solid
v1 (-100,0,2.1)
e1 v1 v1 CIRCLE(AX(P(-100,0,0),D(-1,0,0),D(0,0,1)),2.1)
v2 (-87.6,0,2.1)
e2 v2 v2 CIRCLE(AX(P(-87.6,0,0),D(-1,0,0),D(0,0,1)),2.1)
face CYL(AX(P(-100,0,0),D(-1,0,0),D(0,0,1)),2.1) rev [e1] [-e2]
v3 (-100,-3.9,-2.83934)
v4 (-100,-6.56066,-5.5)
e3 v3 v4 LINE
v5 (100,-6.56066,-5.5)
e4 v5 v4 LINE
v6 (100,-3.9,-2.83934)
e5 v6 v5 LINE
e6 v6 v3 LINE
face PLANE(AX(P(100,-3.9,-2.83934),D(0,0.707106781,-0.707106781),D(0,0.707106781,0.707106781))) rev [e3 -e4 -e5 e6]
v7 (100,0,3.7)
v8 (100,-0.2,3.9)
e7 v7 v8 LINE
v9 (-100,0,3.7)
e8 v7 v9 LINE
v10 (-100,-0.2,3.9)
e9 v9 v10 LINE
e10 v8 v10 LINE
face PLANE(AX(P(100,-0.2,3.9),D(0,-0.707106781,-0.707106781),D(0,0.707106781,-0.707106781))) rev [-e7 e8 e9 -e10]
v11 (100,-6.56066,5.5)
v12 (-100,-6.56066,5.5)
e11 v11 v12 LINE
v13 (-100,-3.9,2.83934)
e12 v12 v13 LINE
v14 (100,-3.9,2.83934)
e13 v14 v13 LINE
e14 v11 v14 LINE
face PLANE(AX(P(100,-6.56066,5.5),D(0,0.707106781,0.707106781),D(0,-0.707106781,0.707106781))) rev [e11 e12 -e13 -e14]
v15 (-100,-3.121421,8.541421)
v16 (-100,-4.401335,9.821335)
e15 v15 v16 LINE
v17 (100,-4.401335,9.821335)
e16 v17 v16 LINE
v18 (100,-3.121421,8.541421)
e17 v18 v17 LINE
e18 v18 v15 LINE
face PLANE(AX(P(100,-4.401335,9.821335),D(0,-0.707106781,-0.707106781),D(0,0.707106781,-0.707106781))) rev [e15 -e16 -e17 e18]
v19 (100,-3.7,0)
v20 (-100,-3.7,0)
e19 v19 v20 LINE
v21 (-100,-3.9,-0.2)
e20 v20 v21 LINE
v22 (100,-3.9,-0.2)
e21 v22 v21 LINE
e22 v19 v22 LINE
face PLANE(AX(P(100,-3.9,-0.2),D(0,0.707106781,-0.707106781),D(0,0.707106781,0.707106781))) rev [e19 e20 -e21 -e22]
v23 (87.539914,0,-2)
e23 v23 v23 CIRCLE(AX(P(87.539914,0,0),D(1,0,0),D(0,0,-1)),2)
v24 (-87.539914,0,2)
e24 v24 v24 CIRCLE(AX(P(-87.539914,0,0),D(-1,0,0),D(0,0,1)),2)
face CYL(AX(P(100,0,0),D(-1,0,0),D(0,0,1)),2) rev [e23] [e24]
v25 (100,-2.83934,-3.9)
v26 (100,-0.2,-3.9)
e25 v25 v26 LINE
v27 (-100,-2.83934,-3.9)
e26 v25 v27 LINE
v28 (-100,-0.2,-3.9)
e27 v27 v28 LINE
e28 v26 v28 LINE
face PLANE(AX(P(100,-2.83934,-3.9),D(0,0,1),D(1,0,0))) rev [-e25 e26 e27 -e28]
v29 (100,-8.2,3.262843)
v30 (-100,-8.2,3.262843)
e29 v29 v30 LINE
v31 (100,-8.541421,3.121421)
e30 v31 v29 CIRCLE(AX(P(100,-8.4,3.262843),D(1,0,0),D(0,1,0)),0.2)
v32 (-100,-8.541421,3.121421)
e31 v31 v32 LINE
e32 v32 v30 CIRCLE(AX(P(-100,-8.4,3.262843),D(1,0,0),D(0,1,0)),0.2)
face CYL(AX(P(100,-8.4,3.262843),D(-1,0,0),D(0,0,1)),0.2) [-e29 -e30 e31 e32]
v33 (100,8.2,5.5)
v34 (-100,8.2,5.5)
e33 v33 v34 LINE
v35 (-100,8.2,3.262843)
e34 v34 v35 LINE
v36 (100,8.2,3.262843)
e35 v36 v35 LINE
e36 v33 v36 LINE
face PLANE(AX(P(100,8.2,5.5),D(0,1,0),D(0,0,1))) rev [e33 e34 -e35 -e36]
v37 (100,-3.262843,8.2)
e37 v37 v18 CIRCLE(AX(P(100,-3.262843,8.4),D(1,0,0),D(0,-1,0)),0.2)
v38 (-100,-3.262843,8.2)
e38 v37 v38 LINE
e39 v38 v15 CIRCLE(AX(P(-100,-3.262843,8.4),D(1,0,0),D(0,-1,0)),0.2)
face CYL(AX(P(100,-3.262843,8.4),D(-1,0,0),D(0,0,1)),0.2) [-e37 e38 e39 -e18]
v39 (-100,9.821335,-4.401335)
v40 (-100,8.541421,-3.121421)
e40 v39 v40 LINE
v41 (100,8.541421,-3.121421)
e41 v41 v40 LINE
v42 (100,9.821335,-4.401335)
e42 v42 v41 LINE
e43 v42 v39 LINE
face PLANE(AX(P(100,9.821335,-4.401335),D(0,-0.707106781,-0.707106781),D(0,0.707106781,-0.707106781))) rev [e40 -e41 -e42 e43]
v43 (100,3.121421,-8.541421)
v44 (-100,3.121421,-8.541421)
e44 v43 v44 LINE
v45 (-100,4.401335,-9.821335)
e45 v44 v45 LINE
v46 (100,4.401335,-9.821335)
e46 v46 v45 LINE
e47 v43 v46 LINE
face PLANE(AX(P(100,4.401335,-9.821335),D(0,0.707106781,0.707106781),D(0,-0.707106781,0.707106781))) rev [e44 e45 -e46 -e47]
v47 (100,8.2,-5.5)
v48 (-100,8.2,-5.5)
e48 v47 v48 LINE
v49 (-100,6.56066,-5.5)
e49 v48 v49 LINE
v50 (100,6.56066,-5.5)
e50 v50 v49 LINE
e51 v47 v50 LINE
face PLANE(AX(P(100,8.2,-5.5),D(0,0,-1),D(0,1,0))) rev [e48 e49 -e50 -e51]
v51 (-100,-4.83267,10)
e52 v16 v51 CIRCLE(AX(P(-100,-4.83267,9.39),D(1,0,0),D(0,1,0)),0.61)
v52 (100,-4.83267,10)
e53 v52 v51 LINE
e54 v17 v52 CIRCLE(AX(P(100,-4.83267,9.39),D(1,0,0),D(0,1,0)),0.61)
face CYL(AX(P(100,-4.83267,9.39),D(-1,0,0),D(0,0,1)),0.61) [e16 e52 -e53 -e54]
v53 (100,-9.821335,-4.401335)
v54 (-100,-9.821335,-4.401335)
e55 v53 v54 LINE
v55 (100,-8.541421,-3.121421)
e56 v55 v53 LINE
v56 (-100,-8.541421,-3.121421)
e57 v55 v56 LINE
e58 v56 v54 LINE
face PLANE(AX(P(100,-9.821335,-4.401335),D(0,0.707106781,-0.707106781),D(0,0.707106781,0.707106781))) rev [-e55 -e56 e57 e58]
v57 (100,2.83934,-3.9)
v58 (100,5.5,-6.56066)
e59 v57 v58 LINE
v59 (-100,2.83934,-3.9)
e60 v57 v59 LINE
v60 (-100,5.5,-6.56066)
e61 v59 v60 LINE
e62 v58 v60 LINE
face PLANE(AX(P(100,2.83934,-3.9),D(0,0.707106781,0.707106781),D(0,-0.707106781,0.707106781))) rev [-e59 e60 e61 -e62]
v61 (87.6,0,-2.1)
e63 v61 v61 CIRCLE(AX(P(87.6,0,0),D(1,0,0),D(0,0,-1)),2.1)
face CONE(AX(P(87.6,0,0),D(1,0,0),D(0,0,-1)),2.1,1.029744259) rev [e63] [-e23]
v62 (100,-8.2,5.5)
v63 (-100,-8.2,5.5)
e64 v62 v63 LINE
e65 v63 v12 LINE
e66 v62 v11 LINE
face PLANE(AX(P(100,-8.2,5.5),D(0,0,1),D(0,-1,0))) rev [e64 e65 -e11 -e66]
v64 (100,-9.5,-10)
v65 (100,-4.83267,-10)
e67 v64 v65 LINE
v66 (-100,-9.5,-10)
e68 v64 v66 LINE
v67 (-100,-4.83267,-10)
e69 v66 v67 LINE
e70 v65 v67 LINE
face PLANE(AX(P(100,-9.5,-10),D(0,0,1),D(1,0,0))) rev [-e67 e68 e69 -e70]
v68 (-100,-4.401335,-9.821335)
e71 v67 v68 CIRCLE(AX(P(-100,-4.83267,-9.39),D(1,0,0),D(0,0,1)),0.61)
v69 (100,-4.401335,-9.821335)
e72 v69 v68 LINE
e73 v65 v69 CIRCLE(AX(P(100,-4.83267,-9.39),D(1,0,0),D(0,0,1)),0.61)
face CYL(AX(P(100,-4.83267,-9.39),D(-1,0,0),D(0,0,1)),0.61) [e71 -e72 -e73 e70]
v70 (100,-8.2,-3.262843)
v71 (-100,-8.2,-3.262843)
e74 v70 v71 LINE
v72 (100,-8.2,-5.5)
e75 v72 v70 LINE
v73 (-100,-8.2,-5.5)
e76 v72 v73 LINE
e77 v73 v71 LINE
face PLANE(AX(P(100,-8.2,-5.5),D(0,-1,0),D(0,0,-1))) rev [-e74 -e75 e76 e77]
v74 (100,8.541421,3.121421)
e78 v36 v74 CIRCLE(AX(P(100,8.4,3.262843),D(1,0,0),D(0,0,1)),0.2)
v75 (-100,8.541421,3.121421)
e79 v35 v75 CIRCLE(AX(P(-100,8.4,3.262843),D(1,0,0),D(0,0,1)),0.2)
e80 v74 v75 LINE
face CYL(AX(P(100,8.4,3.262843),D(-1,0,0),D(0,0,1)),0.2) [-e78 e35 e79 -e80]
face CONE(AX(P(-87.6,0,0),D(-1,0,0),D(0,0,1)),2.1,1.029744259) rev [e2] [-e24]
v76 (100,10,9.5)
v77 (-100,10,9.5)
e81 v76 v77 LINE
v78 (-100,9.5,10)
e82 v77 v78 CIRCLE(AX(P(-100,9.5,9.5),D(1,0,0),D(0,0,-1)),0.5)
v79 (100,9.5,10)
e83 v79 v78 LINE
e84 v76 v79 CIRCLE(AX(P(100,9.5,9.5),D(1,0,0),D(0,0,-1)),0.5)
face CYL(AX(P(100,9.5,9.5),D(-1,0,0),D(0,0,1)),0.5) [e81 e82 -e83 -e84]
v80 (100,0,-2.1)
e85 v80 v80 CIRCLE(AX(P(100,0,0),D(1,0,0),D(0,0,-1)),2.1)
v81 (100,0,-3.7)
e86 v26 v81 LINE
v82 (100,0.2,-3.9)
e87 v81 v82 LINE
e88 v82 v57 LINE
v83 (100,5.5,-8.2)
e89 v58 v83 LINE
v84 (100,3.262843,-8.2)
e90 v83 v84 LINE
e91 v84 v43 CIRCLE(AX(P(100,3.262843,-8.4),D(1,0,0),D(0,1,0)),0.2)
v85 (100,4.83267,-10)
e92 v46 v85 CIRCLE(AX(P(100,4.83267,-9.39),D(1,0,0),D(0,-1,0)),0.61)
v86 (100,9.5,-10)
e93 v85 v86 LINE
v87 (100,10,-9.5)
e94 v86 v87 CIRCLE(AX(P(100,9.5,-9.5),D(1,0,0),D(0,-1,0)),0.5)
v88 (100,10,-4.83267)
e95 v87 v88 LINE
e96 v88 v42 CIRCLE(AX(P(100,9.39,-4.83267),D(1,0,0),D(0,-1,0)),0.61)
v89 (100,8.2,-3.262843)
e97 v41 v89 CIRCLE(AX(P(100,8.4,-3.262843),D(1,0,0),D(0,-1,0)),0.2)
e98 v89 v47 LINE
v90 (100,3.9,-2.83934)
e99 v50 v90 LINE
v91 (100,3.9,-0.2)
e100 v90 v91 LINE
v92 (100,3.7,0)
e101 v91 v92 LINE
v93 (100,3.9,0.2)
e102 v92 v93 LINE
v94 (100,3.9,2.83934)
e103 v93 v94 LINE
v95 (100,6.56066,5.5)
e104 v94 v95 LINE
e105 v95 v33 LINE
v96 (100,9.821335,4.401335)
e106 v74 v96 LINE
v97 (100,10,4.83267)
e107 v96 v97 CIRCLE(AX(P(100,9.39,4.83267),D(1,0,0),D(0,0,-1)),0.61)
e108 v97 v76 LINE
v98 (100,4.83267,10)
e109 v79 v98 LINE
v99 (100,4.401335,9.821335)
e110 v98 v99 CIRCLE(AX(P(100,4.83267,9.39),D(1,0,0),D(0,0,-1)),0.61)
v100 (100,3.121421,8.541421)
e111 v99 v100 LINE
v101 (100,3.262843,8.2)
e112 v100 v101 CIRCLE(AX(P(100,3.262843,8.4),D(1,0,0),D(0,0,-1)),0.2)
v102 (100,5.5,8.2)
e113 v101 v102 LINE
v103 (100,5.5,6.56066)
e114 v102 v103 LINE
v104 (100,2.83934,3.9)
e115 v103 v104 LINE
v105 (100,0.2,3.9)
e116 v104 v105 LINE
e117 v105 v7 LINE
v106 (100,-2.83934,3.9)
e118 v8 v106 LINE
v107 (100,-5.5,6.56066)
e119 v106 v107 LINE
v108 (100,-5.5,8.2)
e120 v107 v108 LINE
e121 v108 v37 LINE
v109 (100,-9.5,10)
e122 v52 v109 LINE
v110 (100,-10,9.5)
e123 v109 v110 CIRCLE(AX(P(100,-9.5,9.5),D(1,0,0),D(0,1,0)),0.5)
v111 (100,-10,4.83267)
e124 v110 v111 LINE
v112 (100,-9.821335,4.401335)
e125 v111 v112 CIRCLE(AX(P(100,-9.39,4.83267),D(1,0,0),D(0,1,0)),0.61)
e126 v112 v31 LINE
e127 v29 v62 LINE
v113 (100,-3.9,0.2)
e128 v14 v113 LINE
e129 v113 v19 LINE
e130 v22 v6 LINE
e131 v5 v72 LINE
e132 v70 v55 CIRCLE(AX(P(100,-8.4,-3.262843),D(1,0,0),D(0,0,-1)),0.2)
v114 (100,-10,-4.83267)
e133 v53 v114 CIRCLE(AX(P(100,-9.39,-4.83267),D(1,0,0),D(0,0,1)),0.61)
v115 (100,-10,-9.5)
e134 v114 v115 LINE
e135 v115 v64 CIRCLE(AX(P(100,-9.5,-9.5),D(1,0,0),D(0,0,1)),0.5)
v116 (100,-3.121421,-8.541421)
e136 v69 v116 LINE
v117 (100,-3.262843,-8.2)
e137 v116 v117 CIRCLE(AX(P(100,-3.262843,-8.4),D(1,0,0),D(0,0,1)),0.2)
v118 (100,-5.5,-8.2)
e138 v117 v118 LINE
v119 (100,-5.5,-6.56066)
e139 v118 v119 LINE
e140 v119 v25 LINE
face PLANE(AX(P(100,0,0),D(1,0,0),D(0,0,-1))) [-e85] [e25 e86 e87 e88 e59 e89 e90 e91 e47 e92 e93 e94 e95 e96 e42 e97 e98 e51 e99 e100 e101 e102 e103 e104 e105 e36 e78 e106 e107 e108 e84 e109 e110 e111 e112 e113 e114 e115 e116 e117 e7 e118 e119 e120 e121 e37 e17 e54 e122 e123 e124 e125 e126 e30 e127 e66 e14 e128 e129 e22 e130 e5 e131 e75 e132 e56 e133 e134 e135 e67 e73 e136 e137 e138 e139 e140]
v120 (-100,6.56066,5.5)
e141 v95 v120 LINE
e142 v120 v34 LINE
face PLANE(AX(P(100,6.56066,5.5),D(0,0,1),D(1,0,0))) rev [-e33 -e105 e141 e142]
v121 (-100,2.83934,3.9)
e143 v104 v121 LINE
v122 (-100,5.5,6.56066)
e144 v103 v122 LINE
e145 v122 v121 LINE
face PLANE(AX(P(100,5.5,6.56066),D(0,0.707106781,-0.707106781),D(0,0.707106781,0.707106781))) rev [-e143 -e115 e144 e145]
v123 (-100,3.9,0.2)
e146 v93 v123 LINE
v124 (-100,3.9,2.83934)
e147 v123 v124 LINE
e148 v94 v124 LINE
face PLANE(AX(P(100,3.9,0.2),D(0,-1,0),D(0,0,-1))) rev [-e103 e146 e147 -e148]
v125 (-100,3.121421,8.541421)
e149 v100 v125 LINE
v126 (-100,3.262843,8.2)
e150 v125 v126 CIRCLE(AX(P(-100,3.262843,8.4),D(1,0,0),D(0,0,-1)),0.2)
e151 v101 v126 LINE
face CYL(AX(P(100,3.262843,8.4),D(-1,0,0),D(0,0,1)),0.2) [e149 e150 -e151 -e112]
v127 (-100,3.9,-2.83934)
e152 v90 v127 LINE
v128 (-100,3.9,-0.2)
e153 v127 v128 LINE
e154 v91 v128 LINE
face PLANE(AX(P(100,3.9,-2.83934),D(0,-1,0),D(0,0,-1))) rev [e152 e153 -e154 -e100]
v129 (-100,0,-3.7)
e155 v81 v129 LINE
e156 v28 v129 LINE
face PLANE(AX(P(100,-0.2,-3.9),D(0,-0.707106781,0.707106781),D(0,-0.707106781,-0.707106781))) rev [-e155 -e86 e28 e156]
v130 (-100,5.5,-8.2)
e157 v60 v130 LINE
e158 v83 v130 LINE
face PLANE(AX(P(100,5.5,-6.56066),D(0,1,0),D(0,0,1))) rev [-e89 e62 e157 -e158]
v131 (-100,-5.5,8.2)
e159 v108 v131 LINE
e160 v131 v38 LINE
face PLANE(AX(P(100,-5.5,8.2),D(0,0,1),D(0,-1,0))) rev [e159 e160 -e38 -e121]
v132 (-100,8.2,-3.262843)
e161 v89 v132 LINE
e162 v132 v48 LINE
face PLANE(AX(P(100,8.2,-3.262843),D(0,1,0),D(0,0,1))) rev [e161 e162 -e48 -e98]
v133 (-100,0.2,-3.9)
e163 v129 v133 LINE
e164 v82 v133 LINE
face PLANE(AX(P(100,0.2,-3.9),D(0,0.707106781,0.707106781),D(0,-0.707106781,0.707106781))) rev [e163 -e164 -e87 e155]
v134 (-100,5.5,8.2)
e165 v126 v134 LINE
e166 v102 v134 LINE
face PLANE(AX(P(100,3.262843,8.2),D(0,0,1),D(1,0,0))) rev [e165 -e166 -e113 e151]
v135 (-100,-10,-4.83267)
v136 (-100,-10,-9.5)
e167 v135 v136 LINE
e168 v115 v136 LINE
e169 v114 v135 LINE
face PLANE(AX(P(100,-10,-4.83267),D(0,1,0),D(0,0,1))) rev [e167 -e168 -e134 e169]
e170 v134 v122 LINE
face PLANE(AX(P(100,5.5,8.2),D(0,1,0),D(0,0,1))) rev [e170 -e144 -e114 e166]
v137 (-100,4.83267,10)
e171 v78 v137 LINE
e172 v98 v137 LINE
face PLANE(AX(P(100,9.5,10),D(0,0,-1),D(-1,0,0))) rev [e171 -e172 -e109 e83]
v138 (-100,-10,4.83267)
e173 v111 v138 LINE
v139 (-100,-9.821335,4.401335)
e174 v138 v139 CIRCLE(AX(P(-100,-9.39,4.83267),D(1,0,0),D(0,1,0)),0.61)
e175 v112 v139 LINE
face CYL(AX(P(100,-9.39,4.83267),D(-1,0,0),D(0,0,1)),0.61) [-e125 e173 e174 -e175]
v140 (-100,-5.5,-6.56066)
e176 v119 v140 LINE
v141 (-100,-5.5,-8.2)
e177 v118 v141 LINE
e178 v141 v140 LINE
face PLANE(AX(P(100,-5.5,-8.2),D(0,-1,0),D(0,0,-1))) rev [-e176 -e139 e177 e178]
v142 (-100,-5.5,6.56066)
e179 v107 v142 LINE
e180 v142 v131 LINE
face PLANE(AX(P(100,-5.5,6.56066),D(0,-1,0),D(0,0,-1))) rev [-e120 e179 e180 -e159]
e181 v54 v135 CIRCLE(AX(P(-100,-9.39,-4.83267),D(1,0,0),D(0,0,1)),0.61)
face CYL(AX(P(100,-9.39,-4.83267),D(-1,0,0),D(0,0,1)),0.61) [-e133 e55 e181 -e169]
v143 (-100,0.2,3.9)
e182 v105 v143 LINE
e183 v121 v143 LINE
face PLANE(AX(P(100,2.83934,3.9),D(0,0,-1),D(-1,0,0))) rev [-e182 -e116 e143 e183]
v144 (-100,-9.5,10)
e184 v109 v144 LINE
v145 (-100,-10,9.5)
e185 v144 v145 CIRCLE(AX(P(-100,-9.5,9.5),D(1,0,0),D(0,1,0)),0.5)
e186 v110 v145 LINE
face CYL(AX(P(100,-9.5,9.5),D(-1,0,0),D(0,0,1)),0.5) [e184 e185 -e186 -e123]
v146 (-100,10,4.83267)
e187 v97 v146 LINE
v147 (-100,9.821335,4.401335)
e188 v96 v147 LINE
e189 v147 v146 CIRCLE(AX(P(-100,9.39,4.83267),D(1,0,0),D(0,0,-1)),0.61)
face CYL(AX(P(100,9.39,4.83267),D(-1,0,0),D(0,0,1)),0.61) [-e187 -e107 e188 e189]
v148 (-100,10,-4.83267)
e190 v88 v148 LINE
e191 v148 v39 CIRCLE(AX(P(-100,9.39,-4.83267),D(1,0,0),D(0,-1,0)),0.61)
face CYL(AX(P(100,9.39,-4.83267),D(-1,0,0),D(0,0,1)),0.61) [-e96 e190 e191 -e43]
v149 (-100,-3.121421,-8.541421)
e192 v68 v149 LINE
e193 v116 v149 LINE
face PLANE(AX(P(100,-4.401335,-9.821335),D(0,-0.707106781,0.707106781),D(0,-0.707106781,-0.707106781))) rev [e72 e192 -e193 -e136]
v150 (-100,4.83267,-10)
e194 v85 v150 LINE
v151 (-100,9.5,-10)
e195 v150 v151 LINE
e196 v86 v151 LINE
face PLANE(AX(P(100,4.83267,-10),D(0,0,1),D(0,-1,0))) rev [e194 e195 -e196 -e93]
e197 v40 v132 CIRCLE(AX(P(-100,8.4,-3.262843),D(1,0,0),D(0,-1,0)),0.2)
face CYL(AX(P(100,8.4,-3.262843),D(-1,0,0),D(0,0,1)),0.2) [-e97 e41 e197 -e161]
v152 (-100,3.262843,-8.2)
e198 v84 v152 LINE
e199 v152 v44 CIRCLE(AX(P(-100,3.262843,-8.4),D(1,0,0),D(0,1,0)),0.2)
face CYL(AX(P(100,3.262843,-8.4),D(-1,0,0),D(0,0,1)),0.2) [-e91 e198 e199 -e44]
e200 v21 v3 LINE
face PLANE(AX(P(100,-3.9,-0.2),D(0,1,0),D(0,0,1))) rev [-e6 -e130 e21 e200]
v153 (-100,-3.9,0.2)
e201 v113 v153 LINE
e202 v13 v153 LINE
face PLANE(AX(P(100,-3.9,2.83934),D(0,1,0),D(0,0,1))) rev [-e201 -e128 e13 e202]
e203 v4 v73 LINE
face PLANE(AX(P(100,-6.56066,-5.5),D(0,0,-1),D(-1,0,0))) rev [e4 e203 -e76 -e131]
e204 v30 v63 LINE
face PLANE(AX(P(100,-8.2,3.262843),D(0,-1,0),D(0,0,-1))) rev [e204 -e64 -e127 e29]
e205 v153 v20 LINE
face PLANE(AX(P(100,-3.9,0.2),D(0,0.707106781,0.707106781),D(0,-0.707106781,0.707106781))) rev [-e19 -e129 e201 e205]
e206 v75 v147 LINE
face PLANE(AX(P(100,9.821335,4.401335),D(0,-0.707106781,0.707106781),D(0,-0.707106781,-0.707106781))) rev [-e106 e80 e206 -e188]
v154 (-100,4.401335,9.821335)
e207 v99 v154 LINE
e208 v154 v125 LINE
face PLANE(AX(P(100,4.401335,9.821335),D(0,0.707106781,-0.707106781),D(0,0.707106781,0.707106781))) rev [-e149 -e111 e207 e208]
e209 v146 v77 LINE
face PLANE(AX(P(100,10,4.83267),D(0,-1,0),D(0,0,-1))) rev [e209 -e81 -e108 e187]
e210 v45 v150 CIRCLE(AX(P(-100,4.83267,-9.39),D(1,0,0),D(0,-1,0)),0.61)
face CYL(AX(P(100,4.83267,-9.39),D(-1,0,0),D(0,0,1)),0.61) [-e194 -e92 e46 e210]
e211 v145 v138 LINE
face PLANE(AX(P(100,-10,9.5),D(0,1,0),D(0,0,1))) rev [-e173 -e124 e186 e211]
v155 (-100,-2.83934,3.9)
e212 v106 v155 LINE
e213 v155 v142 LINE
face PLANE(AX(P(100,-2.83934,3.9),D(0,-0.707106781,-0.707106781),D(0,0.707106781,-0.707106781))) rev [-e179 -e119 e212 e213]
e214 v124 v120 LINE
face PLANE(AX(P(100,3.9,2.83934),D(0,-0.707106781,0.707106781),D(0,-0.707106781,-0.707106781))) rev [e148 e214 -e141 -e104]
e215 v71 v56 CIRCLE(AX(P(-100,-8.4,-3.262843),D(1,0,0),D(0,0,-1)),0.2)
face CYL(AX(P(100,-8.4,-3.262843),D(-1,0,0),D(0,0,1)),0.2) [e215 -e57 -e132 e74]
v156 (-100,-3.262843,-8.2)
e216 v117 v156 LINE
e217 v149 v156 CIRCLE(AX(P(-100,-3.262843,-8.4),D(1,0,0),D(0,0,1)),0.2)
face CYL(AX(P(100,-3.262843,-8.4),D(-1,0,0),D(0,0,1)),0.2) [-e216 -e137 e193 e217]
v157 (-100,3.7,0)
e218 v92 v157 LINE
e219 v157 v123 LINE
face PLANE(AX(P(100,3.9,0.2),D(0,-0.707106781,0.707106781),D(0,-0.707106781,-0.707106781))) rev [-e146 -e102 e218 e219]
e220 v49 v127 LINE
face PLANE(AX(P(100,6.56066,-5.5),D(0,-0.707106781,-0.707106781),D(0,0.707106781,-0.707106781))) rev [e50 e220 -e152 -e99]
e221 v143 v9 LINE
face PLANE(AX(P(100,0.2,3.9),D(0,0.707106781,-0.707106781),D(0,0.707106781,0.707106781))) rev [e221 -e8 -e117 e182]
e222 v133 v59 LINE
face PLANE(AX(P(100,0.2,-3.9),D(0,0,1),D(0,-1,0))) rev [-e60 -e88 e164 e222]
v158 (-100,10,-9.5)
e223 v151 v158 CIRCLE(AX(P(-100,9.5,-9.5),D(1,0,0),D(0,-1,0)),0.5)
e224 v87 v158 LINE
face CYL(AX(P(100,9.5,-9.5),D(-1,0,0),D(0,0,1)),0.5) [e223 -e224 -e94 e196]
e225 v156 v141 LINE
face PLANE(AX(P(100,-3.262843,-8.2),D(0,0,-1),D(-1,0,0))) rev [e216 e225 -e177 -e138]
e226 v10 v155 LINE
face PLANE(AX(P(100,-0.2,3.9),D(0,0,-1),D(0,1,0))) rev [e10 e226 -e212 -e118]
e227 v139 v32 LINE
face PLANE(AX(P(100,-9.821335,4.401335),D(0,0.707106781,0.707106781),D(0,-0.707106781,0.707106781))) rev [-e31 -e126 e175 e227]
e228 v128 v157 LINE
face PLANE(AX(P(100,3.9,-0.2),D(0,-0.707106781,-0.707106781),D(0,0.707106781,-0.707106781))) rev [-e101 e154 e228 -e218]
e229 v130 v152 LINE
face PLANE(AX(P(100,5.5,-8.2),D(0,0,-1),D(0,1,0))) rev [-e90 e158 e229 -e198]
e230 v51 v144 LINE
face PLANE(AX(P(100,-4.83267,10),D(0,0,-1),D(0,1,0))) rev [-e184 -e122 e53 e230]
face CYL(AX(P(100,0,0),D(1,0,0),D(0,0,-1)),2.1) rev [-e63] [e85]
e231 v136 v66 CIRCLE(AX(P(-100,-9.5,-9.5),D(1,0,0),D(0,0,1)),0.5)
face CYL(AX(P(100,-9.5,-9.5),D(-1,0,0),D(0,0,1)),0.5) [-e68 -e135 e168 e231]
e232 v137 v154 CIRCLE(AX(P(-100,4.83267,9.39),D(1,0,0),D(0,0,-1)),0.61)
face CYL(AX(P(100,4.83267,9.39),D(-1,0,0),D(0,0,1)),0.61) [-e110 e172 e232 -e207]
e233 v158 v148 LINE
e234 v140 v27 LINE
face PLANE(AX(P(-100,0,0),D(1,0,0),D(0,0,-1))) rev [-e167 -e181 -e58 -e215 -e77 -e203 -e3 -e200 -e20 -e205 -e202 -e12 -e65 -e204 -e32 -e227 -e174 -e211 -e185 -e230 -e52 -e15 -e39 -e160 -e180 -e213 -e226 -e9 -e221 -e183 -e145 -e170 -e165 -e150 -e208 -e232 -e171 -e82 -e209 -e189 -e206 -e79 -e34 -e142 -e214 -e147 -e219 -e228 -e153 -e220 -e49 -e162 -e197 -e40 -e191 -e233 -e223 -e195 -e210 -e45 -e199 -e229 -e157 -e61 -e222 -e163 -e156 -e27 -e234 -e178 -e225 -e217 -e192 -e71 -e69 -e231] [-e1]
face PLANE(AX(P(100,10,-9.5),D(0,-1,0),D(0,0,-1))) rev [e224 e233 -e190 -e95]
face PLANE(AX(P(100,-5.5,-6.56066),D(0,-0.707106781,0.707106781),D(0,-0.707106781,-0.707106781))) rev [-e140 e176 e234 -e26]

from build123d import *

# Parameters (mm, degrees)
BOSS_EXTRUDE1_DEPTH = 100
CIRPATTERN1_COUNT   = 4


# Read off the part's stored shape, not the designer's step: M5 Tapped Hole1
with BuildPart() as part:
    # Sketch1 → Boss-Extrude1 (new, symmetric)
    with BuildSketch(Plane(origin=(0, 0, 0), x_dir=(0, 0, -1), z_dir=(1, 0, 0))):
        with BuildLine():
            Line((0, 2), (0, 3.7))
            Line((0, 3.7), (-0.2, 3.9))
            Line((-0.2, 3.9), (-2.839339827, 3.9))
            Line((-2.839339827, 3.9), (-5.5, 6.560660173))
            Line((-5.5, 6.560660173), (-5.5, 8.2))
            Line((-5.5, 8.2), (-3.262842712, 8.2))
            ThreePointArc((-3.262842712, 8.2), (-3.078066806, 8.323463314), (-3.121421356, 8.541421356))
            Line((-3.121421356, 8.541421356), (-4.401335137, 9.821335137))
            ThreePointArc((-4.401335137, 9.821335137), (-4.599233379, 9.953566515), (-4.832670273, 10))
            Line((-4.832670273, 10), (-9.5, 10))
            ThreePointArc((-9.5, 10), (-9.853553391, 9.853553391), (-10, 9.5))
            Line((-10, 9.5), (-10, 4.832670273))
            ThreePointArc((-10, 4.832670273), (-9.953566515, 4.599233379), (-9.821335137, 4.401335137))
            Line((-9.821335137, 4.401335137), (-8.541421356, 3.121421356))
            ThreePointArc((-8.541421356, 3.121421356), (-8.323463314, 3.078066806), (-8.2, 3.262842712))
            Line((-8.2, 3.262842712), (-8.2, 5.5))
            Line((-8.2, 5.5), (-6.560660173, 5.5))
            Line((-6.560660173, 5.5), (-3.9, 2.839339827))
            Line((-3.9, 2.839339827), (-3.9, 0.2))
            Line((-3.9, 0.2), (-3.7, 0))
            Line((-3.7, 0), (-2, 0))
            ThreePointArc((-2, 0), (-1.414213562, 1.414213562), (0, 2))
        make_face()
    boss_extrude1 = extrude(amount=BOSS_EXTRUDE1_DEPTH, both=True)

    # CirPattern1: Boss-Extrude1 ×4 about axis
    cirpattern1_axis = Axis((0, 0, 0), (1, 0, 0))
    for i in range(1, CIRPATTERN1_COUNT):
        add(boss_extrude1.rotate(cirpattern1_axis, i * 360 / CIRPATTERN1_COUNT))

    # M5 Tapped Hole1 outline → M5 Tapped Hole1 (revolve, cut)
    with BuildSketch(Plane.YX):
        Polygon((2.1, -87.6), (2, -87.539913938), (2, -100), (2.1, -100), align=None)
        Polygon((2, 100), (2, 87.539913938), (2.1, 87.6), (2.1, 100), align=None)
    revolve(axis=Axis((0, 0, 0), (1, 0, 0)), mode=Mode.SUBTRACT)


solid = part.part
